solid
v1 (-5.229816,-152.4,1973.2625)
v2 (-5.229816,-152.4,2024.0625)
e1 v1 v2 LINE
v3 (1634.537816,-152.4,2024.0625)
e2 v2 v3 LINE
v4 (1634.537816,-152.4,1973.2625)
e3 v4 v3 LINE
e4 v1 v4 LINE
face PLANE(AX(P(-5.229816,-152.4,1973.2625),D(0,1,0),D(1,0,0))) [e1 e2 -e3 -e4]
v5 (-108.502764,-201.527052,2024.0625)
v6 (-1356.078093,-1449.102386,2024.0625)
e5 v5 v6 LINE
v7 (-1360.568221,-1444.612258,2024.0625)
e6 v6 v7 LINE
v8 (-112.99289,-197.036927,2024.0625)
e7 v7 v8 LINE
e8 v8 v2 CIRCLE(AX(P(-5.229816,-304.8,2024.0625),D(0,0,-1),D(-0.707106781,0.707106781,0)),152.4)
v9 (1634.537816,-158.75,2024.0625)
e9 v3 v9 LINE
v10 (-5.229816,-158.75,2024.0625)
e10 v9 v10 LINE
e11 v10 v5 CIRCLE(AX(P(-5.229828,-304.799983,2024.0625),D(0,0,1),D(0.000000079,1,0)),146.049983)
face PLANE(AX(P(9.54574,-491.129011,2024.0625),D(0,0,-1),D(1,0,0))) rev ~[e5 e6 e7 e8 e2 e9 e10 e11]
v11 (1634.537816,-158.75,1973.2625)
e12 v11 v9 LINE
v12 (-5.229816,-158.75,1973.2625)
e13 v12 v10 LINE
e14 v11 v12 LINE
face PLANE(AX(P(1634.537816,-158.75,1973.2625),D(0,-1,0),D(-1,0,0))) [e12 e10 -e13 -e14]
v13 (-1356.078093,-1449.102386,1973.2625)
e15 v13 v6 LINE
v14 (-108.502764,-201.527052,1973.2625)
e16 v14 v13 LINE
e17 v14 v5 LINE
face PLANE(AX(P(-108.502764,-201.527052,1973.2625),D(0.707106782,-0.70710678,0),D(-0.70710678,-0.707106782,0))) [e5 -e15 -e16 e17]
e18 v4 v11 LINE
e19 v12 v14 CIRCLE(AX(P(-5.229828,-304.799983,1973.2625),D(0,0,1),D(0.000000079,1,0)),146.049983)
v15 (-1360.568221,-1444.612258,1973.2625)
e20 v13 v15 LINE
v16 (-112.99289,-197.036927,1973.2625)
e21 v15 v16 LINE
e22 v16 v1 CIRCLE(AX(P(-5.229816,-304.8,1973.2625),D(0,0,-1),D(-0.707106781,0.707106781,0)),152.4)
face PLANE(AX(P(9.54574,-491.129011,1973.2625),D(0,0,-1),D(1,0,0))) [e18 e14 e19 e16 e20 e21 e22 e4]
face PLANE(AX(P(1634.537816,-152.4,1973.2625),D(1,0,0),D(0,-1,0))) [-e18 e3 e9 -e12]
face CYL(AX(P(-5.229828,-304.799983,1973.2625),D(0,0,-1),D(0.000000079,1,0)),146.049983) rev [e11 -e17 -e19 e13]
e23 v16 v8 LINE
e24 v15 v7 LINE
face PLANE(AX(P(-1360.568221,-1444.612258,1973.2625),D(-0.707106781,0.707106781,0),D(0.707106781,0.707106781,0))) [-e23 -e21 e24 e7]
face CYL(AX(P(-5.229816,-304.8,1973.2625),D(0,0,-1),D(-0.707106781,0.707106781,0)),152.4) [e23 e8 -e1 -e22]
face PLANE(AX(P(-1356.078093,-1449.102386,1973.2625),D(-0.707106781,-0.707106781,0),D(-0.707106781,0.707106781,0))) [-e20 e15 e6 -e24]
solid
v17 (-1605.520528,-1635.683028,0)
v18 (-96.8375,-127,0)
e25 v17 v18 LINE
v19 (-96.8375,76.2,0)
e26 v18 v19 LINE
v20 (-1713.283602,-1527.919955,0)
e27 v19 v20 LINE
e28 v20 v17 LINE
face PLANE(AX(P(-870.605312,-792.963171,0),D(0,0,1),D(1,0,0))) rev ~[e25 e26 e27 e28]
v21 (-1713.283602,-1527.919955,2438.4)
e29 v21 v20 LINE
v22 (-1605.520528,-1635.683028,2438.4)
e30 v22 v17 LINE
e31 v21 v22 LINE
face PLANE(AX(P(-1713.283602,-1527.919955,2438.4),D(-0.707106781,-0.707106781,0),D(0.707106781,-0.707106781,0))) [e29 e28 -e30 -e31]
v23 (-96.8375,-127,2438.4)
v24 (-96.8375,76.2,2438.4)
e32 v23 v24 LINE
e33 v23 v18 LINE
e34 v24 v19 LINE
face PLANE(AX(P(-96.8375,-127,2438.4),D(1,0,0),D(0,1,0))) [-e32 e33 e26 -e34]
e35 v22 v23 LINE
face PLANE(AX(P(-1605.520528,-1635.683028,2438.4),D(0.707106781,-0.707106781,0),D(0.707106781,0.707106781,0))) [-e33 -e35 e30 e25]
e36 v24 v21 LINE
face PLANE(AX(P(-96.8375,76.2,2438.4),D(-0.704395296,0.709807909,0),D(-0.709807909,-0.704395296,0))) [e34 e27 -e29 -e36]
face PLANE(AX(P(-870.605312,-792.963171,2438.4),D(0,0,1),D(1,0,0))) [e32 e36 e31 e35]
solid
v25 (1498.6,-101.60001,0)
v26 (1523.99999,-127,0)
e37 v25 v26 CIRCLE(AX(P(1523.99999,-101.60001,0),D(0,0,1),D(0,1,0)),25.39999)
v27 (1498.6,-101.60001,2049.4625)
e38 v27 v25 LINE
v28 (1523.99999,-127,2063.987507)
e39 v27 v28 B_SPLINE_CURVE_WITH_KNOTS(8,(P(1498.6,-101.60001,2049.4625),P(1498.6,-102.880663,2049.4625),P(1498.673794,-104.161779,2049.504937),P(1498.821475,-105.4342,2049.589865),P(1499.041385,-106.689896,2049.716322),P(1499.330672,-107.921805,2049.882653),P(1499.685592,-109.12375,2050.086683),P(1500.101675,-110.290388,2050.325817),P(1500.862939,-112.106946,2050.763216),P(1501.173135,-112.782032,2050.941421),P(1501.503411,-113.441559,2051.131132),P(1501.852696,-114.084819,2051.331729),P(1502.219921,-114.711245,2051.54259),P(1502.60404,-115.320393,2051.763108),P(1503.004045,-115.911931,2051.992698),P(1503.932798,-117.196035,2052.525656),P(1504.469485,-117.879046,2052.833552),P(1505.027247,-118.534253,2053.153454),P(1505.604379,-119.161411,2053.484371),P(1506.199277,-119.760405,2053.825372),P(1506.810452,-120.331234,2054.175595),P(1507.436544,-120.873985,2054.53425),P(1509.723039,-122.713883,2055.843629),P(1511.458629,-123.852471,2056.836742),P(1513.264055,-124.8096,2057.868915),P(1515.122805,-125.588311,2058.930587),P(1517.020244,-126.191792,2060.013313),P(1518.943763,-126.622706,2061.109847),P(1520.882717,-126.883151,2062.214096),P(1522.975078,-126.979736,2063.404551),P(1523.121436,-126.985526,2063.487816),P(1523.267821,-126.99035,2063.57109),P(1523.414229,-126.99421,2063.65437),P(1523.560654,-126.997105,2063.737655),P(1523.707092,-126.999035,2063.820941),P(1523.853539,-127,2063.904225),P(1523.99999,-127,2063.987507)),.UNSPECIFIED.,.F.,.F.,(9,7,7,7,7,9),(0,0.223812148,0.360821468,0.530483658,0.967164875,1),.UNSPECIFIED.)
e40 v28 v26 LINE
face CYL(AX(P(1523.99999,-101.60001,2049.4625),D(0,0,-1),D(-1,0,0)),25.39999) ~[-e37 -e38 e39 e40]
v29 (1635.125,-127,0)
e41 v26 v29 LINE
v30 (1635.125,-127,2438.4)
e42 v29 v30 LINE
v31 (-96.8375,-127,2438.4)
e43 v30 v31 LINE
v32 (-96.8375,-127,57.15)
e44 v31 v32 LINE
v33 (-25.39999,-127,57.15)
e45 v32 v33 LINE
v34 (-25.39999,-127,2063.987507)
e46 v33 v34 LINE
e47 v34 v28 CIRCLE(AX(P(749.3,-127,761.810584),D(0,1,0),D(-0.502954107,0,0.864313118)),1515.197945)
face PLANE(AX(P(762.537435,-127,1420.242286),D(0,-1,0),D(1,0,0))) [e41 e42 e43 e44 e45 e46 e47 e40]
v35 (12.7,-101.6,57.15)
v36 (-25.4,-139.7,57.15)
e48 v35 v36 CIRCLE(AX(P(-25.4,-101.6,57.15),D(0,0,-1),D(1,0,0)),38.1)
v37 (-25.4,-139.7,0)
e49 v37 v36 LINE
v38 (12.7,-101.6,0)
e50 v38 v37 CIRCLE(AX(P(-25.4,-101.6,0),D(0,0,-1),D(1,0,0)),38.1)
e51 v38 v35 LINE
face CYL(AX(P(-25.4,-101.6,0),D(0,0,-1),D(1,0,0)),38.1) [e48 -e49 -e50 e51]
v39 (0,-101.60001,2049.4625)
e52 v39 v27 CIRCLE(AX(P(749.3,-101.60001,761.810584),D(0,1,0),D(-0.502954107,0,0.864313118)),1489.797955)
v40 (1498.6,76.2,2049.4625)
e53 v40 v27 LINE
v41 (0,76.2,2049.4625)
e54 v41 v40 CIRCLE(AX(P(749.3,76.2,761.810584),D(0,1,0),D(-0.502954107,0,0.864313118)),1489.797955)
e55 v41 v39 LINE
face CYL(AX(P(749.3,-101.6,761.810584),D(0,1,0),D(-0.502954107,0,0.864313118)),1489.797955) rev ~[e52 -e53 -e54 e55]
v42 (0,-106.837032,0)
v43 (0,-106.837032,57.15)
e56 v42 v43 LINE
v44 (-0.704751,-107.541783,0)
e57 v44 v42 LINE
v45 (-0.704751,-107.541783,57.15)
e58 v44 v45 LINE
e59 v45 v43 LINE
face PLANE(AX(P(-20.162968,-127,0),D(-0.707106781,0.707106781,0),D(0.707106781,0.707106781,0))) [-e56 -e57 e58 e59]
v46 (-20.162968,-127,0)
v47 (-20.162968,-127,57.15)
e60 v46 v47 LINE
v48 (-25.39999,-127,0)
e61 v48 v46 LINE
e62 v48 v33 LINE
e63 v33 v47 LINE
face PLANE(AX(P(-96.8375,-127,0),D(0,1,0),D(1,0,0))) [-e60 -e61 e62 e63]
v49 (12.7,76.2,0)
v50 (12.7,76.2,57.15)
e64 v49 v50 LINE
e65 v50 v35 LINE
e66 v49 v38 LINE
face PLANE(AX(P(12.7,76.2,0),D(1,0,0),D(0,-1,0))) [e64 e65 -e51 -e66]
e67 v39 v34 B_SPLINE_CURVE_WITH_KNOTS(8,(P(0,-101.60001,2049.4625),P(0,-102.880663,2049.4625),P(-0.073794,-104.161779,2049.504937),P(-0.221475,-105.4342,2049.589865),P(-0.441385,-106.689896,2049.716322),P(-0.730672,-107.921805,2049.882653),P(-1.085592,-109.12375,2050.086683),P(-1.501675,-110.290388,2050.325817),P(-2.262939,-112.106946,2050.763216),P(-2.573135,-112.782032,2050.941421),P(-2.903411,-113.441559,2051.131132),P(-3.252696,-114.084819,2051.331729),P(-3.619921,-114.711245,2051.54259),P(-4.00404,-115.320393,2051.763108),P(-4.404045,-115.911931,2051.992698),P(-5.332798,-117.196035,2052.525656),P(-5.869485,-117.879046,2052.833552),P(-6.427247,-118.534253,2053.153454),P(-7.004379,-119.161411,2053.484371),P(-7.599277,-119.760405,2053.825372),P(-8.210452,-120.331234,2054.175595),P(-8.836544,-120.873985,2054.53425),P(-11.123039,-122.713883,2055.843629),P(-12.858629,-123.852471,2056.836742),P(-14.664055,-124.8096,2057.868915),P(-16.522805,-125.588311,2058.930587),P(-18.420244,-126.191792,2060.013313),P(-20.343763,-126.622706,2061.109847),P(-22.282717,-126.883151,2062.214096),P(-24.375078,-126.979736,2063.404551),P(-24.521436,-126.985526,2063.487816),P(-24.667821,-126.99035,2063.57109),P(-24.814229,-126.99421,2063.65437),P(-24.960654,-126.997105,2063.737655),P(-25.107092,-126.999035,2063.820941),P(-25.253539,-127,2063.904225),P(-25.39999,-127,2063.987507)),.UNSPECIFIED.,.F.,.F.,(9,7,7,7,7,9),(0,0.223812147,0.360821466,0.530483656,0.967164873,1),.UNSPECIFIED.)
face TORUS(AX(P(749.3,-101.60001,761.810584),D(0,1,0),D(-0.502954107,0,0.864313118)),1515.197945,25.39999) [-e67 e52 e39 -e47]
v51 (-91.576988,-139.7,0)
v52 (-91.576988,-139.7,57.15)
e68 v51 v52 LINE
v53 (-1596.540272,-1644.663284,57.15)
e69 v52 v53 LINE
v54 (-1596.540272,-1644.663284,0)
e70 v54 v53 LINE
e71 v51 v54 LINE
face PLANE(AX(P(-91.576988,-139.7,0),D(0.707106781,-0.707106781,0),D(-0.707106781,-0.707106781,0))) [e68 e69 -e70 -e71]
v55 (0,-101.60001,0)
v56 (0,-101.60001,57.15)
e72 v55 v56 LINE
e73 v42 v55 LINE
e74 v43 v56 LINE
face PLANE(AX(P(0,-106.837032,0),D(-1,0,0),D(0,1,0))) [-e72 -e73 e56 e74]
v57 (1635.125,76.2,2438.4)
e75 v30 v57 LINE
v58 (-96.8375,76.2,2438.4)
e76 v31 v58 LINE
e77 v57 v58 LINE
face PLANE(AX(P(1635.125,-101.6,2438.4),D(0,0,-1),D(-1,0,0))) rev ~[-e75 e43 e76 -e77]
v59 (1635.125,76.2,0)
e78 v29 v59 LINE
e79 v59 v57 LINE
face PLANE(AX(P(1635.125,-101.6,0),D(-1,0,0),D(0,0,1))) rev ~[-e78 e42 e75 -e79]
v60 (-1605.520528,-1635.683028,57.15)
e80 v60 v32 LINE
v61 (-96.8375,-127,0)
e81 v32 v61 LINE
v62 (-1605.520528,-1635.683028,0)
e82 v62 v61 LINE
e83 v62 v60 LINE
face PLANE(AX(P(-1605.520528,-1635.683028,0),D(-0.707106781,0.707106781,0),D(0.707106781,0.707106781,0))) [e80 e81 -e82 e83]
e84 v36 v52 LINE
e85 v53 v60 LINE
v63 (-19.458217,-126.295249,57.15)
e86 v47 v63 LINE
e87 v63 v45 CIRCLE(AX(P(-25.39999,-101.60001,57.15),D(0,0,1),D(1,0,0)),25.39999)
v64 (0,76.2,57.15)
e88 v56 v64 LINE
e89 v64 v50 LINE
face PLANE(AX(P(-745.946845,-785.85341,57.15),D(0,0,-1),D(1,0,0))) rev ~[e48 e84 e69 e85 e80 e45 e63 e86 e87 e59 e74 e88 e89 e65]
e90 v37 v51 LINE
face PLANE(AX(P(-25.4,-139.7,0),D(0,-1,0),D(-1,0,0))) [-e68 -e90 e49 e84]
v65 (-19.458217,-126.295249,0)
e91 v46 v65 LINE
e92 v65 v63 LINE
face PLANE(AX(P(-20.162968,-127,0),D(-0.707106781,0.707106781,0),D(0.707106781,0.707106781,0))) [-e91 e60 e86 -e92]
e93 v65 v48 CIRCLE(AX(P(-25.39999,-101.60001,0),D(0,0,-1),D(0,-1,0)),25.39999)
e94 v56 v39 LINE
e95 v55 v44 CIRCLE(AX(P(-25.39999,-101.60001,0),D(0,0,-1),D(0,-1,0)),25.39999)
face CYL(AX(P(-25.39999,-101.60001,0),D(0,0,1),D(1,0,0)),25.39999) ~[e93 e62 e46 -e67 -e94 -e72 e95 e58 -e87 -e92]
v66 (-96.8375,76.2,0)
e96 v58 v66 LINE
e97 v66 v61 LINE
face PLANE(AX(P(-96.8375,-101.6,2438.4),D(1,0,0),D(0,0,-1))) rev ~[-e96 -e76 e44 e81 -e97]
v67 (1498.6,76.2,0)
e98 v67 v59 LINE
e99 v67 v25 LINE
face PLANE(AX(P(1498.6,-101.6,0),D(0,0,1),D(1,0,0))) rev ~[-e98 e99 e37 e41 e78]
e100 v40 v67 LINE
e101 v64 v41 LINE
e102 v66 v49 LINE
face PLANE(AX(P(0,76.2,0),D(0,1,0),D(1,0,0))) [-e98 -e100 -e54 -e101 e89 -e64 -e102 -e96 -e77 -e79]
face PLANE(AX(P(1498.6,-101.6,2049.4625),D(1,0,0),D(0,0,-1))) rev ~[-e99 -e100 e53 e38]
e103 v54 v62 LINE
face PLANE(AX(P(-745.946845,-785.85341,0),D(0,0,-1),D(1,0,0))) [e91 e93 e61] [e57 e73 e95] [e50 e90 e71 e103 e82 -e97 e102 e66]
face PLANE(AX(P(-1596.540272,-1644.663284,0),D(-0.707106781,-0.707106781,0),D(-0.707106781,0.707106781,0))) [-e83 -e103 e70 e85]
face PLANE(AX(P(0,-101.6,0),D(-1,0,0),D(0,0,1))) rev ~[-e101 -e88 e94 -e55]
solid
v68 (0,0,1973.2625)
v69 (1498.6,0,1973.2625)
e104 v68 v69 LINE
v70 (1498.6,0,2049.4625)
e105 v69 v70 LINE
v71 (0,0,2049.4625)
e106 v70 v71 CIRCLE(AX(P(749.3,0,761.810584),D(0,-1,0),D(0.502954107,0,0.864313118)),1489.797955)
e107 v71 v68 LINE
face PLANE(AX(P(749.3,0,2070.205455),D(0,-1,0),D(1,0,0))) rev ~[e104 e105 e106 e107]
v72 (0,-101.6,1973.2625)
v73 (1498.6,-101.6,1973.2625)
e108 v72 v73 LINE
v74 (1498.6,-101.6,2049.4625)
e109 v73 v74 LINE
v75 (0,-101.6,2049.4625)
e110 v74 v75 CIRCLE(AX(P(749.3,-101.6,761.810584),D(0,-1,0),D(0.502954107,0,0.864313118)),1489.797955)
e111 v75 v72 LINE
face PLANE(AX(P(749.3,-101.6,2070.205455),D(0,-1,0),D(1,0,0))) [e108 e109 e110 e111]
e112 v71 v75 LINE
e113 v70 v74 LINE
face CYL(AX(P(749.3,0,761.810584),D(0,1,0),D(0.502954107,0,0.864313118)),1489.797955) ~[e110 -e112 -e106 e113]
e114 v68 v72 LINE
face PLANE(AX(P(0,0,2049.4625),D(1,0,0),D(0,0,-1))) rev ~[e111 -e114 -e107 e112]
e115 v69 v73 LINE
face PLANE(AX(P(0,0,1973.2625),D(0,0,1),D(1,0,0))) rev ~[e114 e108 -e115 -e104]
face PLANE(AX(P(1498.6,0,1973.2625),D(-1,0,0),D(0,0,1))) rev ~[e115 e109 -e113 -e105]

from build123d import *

# Parameters (mm, degrees)
F1_DEPTH  = 101.6
F3_DEPTH  = 177.8
F5_DEPTH  = 25.4
F6_R      = 25.39999
F8_DEPTH  = 2438.4
F10_DEPTH = 57.15
F12_DEPTH = 50.8


# Not quite as in the source:
# - a fillet or chamfer is up to 0.001 mm smaller than in the source, because OpenCascade refuses the exact size
# - ends of sketch curves that miss each other by under 0.0002 mm in the source are joined


with BuildPart() as f1:
    # F0 (on Front) → F1 (new body)
    with BuildSketch(Plane.XZ):
        with BuildLine():
            Line((0, 2049.4625), (0, 1973.2625))
            Line((0, 1973.2625), (1498.6, 1973.2625))
            Line((1498.6, 1973.2625), (1498.6, 2049.4625))
            ThreePointArc((1498.6, 2049.4625), (749.3, 2251.6085390205), (0, 2049.4625))
        make_face()
    extrude(amount=F1_DEPTH)


with BuildPart() as f3:
    # F2 (on face) → F3 (new body)
    with BuildSketch(Plane.XZ.offset(101.6)):
        with BuildLine():
            Line((-96.8375, 0), (0, 0))
            Line((0, 0), (0, 1973.2625))
            Line((0, 1973.2625), (0, 2049.4625))
            ThreePointArc((0, 2049.4625), (749.3, 2251.6085390205), (1498.6, 2049.4625))
            Line((1498.6, 2049.4625), (1498.6, 1973.2625))
            Line((1498.6, 1973.2625), (1498.6, 0))
            Line((1498.6, 0), (1635.125, 0))
            Line((1635.125, 0), (1635.125, 2438.4))
            Line((1635.125, 2438.4), (-96.8375, 2438.4))
            Line((-96.8375, 2438.4), (-96.8375, 0))
        make_face()
    extrude(amount=-F3_DEPTH)

    # F4 (on face) → F5 (join)
    with BuildSketch(Plane.XZ.offset(101.6)):
        with BuildLine():
            Line((-96.8375, 2438.4), (-96.8375, 0))
            Line((-96.8375, 0), (0, 0))
            Line((0, 0), (0, 2049.4625))
            ThreePointArc((0, 2049.4625), (749.3, 2251.6085390205), (1498.6, 2049.4625))
            Line((1498.6, 2049.4625), (1498.6, 0))
            Line((1498.6, 0), (1635.125, 0))
            Line((1635.125, 0), (1635.125, 2438.4))
            Line((1635.125, 2438.4), (-96.8375, 2438.4))
        make_face()
    extrude(amount=F5_DEPTH)

    # F6 (radius 25.4 in the source; OpenCascade refuses exactly that, so slightly less here)
    f6_edges = [f3.edges().sort_by_distance(p)[0] for p in [
        (749.3, -127, 2251.608539),
        (1498.6, -127, 1024.73125),
        (0, -127, 1024.73125),
    ]]
    fillet(f6_edges, radius=F6_R)

    # F9 (on face) → F10 (join)
    with BuildSketch(Plane(origin=(0, 0, 0), x_dir=(1, 0, 0), z_dir=(0, 0, -1))):
        with BuildLine():
            Line((-25.4, 139.7), (-91.5769877579, 139.7))
            Line((-91.5769877579, 139.7), (-1596.5402722185, 1644.6632844607))
            Line((-1596.5402722185, 1644.6632844607), (-1605.5205283396, 1635.6830283396))
            Line((-1605.5205283396, 1635.6830283396), (-96.8375, 127))
            Line((-96.8375, 127), (-20.162967965, 127))
            Line((-20.162967965, 127), (0, 106.837032035))
            Line((0, 106.837032035), (0, -76.2))
            Line((0, -76.2), (12.7, -76.2))
            Line((12.7, -76.2), (12.7, 101.6))
            ThreePointArc((12.7, 101.6), (1.5407683632, 128.5407683632), (-25.4, 139.7))
        make_face()
    extrude(amount=-F10_DEPTH)


with BuildPart() as f8:
    # F7 (on face) → F8 (new body)
    with BuildSketch(Plane.XY.offset(2438.4)):
        Polygon((-1605.5205283396, -1635.6830283396), (-96.8375, -127), (-96.8375, 76.2), (-1713.2836017924, -1527.9199548868), align=None)
    extrude(amount=-F8_DEPTH)


with BuildPart() as f12:
    # F11 (on face) → F12 (new body)
    with BuildSketch(Plane(origin=(0, 0, 1973.2625), x_dir=(1, 0, 0), z_dir=(0, 0, -1))):
        with BuildLine():
            Line((-5.2298163679, 152.4), (1634.5378160477, 152.4))
            Line((1634.5378160477, 152.4), (1634.5378160477, 158.75))
            Line((1634.5378160477, 158.75), (-5.2298163679, 158.75))
            ThreePointArc((-5.2298163679, 158.75), (-61.1207328497, 169.8673914162), (-108.5027639496, 201.5270524183))
            Line((-108.5027639496, 201.5270524183), (-1356.0780931848, 1449.1023860323))
            Line((-1356.0780931848, 1449.1023860323), (-1360.5682212453, 1444.6122579717))
            Line((-1360.5682212453, 1444.6122579717), (-112.9928898208, 197.0369265472))
            ThreePointArc((-112.9928898208, 197.0369265472), (-63.5507714604, 164.0007592453), (-5.2298163679, 152.4))
        make_face()
    extrude(amount=-F12_DEPTH)


solid = Compound([f1.part, f3.part, f8.part, f12.part])
